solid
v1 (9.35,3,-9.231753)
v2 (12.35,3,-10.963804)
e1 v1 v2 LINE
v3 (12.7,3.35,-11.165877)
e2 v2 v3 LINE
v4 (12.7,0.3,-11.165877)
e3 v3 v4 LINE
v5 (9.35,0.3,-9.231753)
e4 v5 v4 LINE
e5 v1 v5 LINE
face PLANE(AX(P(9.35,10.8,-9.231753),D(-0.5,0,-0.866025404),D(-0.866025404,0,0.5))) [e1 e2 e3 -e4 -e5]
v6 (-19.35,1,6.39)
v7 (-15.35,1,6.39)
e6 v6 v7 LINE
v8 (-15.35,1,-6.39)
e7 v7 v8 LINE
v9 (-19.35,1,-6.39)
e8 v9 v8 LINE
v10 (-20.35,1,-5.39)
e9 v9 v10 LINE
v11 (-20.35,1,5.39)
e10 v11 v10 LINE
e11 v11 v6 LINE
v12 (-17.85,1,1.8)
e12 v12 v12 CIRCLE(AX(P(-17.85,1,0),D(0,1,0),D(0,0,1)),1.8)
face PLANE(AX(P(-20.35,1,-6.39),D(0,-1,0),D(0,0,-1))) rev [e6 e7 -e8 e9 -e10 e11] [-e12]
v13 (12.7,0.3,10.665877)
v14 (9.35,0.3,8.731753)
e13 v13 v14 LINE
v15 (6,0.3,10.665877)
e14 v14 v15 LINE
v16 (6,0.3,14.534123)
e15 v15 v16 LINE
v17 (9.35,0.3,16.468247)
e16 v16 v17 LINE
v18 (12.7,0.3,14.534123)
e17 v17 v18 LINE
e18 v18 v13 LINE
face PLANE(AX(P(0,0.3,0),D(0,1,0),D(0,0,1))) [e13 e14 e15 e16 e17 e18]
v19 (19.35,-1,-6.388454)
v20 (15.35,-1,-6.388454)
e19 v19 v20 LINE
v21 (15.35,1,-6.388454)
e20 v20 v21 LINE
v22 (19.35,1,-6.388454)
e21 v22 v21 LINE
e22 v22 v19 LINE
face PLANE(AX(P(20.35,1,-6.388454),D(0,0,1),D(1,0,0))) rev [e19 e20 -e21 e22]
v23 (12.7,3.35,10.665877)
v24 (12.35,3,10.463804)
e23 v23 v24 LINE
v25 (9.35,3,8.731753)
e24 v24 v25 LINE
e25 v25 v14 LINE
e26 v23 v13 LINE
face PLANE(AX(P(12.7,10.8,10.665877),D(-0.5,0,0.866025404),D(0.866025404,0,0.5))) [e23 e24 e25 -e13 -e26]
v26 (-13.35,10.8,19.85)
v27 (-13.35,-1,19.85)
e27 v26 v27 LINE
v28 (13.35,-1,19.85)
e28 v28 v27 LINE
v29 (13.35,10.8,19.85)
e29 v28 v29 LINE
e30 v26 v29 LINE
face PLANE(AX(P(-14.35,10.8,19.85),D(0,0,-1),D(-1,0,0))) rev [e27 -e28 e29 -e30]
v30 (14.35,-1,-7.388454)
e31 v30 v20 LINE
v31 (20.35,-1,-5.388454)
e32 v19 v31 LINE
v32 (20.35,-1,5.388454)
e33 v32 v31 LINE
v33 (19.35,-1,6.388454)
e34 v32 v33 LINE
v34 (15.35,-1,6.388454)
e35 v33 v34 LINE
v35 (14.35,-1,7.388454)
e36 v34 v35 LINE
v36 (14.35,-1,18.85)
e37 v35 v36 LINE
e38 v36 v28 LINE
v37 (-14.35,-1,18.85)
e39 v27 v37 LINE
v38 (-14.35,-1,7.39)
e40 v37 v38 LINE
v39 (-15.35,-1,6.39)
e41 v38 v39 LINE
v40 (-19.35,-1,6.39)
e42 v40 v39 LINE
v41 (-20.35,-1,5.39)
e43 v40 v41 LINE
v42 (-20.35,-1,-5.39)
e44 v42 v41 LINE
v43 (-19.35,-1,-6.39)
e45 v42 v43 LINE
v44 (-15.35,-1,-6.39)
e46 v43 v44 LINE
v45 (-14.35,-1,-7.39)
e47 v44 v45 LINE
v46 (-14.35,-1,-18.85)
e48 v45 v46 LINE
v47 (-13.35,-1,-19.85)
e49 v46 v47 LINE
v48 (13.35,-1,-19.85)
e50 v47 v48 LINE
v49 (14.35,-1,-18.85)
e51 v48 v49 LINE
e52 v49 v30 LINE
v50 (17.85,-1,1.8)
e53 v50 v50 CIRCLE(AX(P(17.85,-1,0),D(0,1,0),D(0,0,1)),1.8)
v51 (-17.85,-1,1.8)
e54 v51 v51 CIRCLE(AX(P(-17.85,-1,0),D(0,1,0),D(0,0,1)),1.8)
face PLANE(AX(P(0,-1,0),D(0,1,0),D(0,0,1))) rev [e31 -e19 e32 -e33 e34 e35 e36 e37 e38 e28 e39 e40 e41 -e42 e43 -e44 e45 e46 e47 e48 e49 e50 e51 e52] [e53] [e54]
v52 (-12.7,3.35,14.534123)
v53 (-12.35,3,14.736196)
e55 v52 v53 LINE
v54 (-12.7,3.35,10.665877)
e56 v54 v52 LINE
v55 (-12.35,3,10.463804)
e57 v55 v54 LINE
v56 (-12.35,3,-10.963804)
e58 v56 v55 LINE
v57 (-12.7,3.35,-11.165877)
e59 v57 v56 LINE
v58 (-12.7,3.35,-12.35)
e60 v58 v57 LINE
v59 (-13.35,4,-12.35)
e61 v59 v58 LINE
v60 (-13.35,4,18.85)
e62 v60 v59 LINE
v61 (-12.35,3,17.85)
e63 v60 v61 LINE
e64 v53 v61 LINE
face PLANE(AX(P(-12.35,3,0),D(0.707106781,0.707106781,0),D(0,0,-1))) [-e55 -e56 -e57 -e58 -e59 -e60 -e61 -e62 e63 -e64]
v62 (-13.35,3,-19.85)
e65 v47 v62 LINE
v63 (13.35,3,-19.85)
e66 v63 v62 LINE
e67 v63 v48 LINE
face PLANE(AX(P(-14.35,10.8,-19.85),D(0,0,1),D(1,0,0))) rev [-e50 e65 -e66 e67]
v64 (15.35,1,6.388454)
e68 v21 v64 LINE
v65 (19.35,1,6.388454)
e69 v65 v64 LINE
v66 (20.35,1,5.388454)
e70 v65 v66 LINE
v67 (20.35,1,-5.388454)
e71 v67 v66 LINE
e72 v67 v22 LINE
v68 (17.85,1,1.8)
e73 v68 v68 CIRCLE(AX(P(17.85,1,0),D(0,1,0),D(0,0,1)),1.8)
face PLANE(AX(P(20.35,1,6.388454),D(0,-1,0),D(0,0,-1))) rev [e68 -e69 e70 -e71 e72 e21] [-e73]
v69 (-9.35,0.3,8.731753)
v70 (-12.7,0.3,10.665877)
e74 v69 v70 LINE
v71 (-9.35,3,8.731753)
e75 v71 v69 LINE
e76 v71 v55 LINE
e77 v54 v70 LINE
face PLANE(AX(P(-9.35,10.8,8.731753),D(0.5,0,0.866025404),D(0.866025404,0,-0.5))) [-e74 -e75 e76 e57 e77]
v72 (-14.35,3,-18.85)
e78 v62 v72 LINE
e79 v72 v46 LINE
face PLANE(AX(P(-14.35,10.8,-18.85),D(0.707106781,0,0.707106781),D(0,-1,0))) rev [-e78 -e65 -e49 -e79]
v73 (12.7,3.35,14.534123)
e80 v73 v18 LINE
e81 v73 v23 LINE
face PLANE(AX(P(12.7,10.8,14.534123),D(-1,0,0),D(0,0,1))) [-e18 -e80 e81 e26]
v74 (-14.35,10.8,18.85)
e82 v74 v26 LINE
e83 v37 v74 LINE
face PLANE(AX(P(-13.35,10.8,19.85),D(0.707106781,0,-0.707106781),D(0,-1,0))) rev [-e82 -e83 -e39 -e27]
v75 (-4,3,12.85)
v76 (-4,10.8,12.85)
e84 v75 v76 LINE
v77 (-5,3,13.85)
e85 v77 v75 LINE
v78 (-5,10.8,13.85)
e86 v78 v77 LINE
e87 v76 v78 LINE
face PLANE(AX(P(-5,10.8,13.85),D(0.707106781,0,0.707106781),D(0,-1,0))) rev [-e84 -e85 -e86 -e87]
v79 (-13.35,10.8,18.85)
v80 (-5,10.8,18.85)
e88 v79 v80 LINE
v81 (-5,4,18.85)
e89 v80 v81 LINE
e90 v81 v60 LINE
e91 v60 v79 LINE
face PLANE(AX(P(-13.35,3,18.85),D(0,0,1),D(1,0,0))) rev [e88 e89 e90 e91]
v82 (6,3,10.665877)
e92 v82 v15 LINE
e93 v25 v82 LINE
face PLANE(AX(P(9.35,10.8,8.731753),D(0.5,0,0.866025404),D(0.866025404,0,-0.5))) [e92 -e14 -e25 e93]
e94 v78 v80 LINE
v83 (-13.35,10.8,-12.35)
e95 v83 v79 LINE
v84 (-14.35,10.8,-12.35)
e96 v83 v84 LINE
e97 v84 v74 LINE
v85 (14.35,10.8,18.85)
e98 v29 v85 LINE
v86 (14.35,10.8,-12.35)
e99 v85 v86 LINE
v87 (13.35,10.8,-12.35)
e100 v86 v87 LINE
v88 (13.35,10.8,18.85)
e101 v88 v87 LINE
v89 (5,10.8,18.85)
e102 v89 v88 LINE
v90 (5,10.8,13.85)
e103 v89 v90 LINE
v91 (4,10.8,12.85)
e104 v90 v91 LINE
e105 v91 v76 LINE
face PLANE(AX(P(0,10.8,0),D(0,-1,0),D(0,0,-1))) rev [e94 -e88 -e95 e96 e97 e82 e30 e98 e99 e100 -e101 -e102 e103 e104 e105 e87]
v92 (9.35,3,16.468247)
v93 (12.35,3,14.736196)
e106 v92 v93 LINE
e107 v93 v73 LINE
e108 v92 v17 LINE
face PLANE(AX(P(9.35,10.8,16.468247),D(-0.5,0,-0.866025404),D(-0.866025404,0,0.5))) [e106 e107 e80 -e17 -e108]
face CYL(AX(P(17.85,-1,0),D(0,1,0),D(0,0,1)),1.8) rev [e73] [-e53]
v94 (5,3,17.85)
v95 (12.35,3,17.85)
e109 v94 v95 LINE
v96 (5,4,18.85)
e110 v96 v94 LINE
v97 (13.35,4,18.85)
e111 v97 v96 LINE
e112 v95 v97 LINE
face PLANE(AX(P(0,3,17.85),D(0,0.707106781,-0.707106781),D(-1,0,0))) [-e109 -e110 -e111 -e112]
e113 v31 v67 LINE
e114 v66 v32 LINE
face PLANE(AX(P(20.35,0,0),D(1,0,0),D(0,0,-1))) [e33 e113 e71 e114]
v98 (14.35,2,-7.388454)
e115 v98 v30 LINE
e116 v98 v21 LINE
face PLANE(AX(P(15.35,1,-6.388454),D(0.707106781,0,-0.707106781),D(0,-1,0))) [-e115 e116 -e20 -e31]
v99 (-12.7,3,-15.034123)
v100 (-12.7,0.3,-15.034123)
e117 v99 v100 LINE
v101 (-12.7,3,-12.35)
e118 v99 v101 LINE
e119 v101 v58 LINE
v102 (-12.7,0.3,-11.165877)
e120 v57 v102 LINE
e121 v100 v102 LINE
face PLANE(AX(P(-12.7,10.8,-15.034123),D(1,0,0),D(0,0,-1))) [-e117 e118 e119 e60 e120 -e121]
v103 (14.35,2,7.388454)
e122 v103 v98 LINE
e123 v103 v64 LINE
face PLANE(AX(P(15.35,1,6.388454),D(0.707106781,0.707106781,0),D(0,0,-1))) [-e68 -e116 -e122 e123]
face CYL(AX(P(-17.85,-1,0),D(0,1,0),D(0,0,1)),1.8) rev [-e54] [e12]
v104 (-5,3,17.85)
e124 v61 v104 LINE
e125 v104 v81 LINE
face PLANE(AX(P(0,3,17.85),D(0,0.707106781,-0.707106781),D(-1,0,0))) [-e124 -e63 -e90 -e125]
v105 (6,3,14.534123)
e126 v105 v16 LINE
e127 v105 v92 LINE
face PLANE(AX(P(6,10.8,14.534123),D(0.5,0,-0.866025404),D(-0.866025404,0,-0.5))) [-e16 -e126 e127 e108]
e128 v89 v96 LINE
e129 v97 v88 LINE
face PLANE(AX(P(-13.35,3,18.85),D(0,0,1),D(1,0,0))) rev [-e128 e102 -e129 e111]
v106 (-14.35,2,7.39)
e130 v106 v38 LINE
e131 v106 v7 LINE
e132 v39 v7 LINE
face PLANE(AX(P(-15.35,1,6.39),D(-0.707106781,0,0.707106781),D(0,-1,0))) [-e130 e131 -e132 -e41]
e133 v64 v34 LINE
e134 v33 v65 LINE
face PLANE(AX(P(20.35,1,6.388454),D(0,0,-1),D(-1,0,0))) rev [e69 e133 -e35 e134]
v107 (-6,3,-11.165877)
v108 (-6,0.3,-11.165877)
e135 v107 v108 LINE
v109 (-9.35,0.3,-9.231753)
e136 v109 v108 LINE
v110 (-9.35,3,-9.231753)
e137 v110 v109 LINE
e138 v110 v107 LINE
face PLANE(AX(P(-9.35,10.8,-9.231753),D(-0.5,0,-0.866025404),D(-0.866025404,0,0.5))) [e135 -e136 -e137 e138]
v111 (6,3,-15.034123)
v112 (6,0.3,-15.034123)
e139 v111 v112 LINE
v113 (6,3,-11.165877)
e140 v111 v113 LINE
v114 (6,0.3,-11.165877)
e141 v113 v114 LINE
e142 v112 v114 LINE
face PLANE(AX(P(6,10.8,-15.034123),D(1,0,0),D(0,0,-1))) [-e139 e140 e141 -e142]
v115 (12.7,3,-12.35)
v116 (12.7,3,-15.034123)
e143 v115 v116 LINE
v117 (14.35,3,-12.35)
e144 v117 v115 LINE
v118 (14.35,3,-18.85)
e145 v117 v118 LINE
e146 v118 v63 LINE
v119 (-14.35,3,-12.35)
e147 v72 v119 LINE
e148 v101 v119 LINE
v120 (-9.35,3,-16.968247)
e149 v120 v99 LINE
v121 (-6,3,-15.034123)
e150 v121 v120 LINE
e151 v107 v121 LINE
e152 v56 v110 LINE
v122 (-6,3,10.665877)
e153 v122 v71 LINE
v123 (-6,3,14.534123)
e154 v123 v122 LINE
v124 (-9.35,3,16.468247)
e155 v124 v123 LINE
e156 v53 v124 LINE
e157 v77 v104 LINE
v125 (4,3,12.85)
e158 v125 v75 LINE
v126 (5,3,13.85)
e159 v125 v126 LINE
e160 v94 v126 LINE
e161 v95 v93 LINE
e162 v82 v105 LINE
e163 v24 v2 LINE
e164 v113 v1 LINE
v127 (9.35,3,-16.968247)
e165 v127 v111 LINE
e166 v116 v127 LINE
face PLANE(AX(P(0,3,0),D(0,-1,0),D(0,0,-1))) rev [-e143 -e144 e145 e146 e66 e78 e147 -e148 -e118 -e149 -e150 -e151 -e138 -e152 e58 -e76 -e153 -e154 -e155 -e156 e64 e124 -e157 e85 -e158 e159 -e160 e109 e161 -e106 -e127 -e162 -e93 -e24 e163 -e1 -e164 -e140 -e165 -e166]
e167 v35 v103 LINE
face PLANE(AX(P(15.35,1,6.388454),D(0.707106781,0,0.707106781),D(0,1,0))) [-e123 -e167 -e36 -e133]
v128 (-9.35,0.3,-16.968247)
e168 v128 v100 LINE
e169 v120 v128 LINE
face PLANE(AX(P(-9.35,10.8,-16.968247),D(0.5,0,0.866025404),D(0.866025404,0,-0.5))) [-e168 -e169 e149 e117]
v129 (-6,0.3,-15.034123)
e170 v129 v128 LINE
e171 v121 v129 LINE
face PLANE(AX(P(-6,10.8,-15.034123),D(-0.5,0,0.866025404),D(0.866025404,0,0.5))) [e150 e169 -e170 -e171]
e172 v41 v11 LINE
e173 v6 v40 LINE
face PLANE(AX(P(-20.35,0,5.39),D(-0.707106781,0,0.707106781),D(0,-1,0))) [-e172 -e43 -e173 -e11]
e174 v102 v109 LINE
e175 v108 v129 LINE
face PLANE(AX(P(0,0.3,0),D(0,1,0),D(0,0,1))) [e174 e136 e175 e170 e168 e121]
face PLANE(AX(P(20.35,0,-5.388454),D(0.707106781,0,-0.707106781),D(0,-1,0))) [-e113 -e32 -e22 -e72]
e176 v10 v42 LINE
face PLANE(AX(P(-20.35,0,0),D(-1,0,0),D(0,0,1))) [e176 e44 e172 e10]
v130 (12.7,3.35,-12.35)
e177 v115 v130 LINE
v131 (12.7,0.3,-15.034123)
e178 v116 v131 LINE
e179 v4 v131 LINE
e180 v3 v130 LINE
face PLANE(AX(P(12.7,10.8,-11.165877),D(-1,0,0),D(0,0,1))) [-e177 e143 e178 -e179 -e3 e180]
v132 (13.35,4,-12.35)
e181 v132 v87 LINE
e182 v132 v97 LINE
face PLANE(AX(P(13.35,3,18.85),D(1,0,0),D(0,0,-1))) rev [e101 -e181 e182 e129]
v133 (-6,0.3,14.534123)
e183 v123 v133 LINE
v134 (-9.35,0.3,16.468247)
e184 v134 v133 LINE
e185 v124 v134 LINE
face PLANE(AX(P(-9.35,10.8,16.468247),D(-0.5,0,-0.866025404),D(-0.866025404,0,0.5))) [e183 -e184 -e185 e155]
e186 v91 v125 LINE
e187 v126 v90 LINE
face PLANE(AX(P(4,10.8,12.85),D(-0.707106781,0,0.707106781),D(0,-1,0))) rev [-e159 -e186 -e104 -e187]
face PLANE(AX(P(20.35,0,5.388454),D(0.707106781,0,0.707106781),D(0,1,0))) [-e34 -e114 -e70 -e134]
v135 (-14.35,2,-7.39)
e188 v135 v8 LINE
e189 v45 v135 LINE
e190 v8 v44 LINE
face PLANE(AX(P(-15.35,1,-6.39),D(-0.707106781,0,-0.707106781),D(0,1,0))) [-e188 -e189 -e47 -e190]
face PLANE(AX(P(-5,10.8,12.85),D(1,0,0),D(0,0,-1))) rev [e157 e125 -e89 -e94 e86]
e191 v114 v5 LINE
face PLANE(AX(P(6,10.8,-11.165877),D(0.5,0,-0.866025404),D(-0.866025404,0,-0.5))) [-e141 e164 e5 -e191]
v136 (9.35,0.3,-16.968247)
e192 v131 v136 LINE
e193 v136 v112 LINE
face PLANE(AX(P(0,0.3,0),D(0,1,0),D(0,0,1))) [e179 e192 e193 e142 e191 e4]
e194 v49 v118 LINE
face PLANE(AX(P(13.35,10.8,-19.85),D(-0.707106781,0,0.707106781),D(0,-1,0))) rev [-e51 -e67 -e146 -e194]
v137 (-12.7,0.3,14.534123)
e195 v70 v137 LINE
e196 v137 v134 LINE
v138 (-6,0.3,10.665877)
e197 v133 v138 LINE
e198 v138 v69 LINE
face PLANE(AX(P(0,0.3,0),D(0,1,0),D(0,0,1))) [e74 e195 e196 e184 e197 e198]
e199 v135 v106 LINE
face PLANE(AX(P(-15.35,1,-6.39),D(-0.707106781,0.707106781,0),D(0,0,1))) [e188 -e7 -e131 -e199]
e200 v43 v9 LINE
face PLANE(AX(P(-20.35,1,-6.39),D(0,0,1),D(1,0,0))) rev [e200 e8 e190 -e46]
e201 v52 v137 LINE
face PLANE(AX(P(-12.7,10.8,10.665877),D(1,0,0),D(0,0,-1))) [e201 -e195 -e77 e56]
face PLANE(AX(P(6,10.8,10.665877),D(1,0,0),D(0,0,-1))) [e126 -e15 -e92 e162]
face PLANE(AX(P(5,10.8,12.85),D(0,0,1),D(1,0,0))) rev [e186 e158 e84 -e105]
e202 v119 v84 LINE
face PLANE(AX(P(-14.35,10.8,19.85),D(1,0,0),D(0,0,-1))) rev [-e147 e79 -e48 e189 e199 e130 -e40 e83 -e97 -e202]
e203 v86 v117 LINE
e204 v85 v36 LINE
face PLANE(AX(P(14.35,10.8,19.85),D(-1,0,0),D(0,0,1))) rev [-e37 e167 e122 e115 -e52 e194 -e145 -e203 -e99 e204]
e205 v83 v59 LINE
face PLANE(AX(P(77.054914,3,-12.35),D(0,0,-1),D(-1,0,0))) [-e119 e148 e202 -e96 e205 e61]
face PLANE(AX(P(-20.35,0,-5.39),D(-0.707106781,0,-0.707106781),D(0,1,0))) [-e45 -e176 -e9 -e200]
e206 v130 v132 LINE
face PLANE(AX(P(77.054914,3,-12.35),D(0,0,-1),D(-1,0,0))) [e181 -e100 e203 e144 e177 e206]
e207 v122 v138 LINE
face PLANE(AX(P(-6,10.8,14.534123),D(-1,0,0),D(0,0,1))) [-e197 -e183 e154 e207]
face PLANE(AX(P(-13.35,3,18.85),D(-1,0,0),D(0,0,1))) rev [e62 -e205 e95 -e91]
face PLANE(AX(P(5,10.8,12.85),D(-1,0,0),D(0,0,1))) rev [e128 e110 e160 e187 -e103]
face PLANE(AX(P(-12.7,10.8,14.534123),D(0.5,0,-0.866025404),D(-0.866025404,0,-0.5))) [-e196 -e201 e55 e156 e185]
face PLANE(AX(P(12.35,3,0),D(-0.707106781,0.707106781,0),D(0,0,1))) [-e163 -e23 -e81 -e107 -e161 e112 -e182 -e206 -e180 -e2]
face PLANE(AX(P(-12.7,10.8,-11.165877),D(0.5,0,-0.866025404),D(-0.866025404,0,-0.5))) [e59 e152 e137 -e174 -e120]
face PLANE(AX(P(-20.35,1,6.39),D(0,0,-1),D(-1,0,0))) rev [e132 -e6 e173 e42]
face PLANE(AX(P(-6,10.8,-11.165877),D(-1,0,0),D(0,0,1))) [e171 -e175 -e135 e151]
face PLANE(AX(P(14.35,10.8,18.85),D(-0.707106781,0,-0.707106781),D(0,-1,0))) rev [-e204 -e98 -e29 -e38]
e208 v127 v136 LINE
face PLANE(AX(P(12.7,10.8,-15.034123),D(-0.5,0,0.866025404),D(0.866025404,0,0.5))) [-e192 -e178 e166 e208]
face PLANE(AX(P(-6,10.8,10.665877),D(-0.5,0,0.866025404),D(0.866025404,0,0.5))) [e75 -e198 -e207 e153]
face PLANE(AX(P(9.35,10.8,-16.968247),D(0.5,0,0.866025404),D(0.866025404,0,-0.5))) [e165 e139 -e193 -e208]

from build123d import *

# Parameters (mm, degrees)
SKETCH2_W               = 28.7
SKETCH2_H               = 39.7
BOSS_EXTRUDE1_DEPTH     = 10.8
SKETCH3_W               = 26.7
SKETCH3_H               = 37.7
CUT_EXTRUDE1_DEPTH      = 7.8
CUT_EXTRUDE2_DEPTH      = 37.528790016
CUT_EXTRUDE2_DEPTH_BACK = 37.528790016
SKETCH4_W               = 7.5
SKETCH4_H               = 7.8
SKETCH6_W               = 28.7
SKETCH6_H               = 39.7
BOSS_EXTRUDE2_DEPTH     = 1
CUT_EXTRUDE3_DEPTH      = 26.705738659
CUT_EXTRUDE3_DEPTH_BACK = 2.7
SKETCH10_W              = 12.7769089
SKETCH10_H              = 2
BOSS_EXTRUDE3_DEPTH     = 6
SKETCH11_R              = 1.8
CUT_EXTRUDE4_DEPTH      = 31.069669104
SKETCH12_W              = 12.78
SKETCH12_H              = 2
BOSS_EXTRUDE4_DEPTH     = 6
SKETCH14_R              = 1.8
CUT_EXTRUDE5_DEPTH      = 31.069669104
CHAMFER1_SIZE           = 1
SKETCH16_W              = 10
SKETCH16_H              = 6
BOSS_EXTRUDE5_DEPTH     = 7.8
CHAMFER2_SIZE           = 1


with BuildPart() as part:
    # Sketch2 → Boss-Extrude1 (new body)
    with BuildSketch(Plane(origin=(0, 0, 0), x_dir=(1, 0, 0), z_dir=(0, 1, 0))):
        Rectangle(SKETCH2_W, SKETCH2_H)
    extrude(amount=BOSS_EXTRUDE1_DEPTH)

    # Sketch3 → Cut-Extrude1 (cut)
    with BuildSketch(Plane(origin=(0, 10.8, 0), x_dir=(1, 0, 0), z_dir=(0, 1, 0))):
        Rectangle(SKETCH3_W, SKETCH3_H)
    extrude(amount=-CUT_EXTRUDE1_DEPTH, mode=Mode.SUBTRACT)

    # Sketch4 → Cut-Extrude2 (cut, two sides: drawn at the far end of the back side and taken through both)
    with BuildSketch(Plane(origin=(14.35, 0, 0), x_dir=(0, 0, -1), z_dir=(1, 0, 0)).offset(-CUT_EXTRUDE2_DEPTH_BACK)):
        with Locations((16.1, 6.9)):
            Rectangle(SKETCH4_W, SKETCH4_H)
    extrude(amount=CUT_EXTRUDE2_DEPTH + CUT_EXTRUDE2_DEPTH_BACK, mode=Mode.SUBTRACT)

    # Sketch6 → Boss-Extrude2 (add)
    with BuildSketch(Plane.XZ):
        Rectangle(SKETCH6_W, SKETCH6_H)
    extrude(amount=BOSS_EXTRUDE2_DEPTH)

    # Sketch9 → Cut-Extrude3 (cut, two sides: drawn at the far end of the back side and taken through both)
    with BuildSketch(Plane(origin=(0, 3, 0), x_dir=(1, 0, 0), z_dir=(0, 1, 0)).offset(-CUT_EXTRUDE3_DEPTH_BACK)):
        Polygon((-9.35, -8.731753196), (-12.7, -10.665876598), (-12.7, -14.534123402), (-9.35, -16.468246804), (-6, -14.534123402), (-6, -10.665876598), align=None)
        Polygon((9.35, -8.731753196), (6, -10.665876598), (6, -14.534123402), (9.35, -16.468246804), (12.7, -14.534123402), (12.7, -10.665876598), align=None)
        Polygon((-9.35, 16.968246804), (-12.7, 15.034123402), (-12.7, 11.165876598), (-9.35, 9.231753196), (-6, 11.165876598), (-6, 15.034123402), align=None)
        Polygon((9.35, 16.968246804), (6, 15.034123402), (6, 11.165876598), (9.35, 9.231753196), (12.7, 11.165876598), (12.7, 15.034123402), align=None)
    extrude(amount=CUT_EXTRUDE3_DEPTH + CUT_EXTRUDE3_DEPTH_BACK, mode=Mode.SUBTRACT)

    # Sketch10 → Boss-Extrude3 (add)
    with BuildSketch(Plane(origin=(14.35, 0, 0), x_dir=(0, 0, -1), z_dir=(1, 0, 0))):
        Rectangle(SKETCH10_W, SKETCH10_H)
    extrude(amount=BOSS_EXTRUDE3_DEPTH)

    # Sketch11 → Cut-Extrude4 (cut, through all)
    with BuildSketch(Plane(origin=(0, 1, 0), x_dir=(1, 0, 0), z_dir=(0, 1, 0))):
        with Locations(Location((17.85, 0, 0), (0, 0, 270))):
            Circle(SKETCH11_R)
    extrude(amount=-CUT_EXTRUDE4_DEPTH, mode=Mode.SUBTRACT)

    # Sketch12 → Boss-Extrude4 (add)
    with BuildSketch(Plane.ZY.offset(14.35)):
        Rectangle(SKETCH12_W, SKETCH12_H)
    extrude(amount=BOSS_EXTRUDE4_DEPTH)

    # Sketch14 → Cut-Extrude5 (cut, through all)
    with BuildSketch(Plane(origin=(0, 1, 0), x_dir=(1, 0, 0), z_dir=(0, 1, 0))):
        with Locations(Location((-17.85, 0, 0), (0, 0, 270))):
            Circle(SKETCH14_R)
    extrude(amount=-CUT_EXTRUDE5_DEPTH, mode=Mode.SUBTRACT)

    # Chamfer1
    chamfer1_edges = [part.edges().sort_by_distance(p)[0] for p in [
        (14.35, 0, -6.38845445),
        (14.35, 1, 0),
        (14.35, 0, 6.38845445),
        (20.35, 0, -6.38845445),
        (20.35, 0, 6.38845445),
        (-14.35, 0, 6.39),
        (-14.35, 1, 0),
        (-14.35, 0, -6.39),
        (-20.35, 0, 6.39),
        (-20.35, 0, -6.39),
        (-14.35, 1, -19.85),
        (14.35, 1, -19.85),
        (14.35, 4.9, 19.85),
        (-14.35, 4.9, 19.85),
    ]]
    chamfer(chamfer1_edges, length=CHAMFER1_SIZE)

    # Sketch16 → Boss-Extrude5 (add)
    with BuildSketch(Plane(origin=(0, 3, 0), x_dir=(1, 0, 0), z_dir=(0, 1, 0))):
        with Locations((0, -15.85)):
            Rectangle(SKETCH16_W, SKETCH16_H)
    extrude(amount=BOSS_EXTRUDE5_DEPTH)

    # Chamfer2
    # the kernel refuses this chamfer: 1 mm, written as the material it adds along each edge
    with BuildSketch(Plane(origin=(13.35, 3, 18.85), x_dir=(0.027495876610585623, 0.9996219169112968, 0), z_dir=(0, 0, -1))) as chamfer2_piece_1_section:
        Polygon((CHAMFER2_SIZE * 0.999621916911, -CHAMFER2_SIZE * 0.0274958766106), (-CHAMFER2_SIZE * 0.0274958766106, -CHAMFER2_SIZE * 0.999621916911), (0, 0), align=None)
    chamfer2_piece_1 = extrude(amount=31.2, mode=Mode.PRIVATE)
    chamfer2_piece_1 = split(chamfer2_piece_1, bisect_by=Plane(origin=(12.111347434, 3.369117542, 14.873982119), z_dir=(0.500000000000001, 0, 0.8660254037844382)), keep=Keep.TOP, mode=Mode.PRIVATE)
    chamfer2_piece_1 = split(chamfer2_piece_1, bisect_by=Plane(origin=(12.7, 3.369117542, 16.577989782), z_dir=(1, 0, 0)), keep=Keep.TOP, mode=Mode.PRIVATE)
    add(chamfer2_piece_1)
    with BuildSketch(Plane(origin=(13.35, 3, 18.85), x_dir=(0.027495876610585623, 0.9996219169112968, 0), z_dir=(0, 0, -1))) as chamfer2_piece_2_section:
        Polygon((CHAMFER2_SIZE * 0.999621916911, -CHAMFER2_SIZE * 0.0274958766106), (-CHAMFER2_SIZE * 0.0274958766106, -CHAMFER2_SIZE * 0.999621916911), (0, 0), align=None)
    chamfer2_piece_2 = extrude(amount=31.2, mode=Mode.PRIVATE)
    chamfer2_piece_2 = split(chamfer2_piece_2, bisect_by=Plane(origin=(11.651023247, 3.093736145, 15.139750413), z_dir=(0.500000000000001, 0, 0.8660254037844382)), keep=Keep.TOP, mode=Mode.PRIVATE)
    chamfer2_piece_2 = split(chamfer2_piece_2, bisect_by=Plane(origin=(12.7, 3.093736145, 16.729857379), z_dir=(-1, 0, 0)), keep=Keep.TOP, mode=Mode.PRIVATE)
    add(chamfer2_piece_2)
    with BuildSketch(Plane(origin=(13.35, 3, 18.85), x_dir=(0.027495876610585623, 0.9996219169112968, 0), z_dir=(0, 0, -1))) as chamfer2_piece_3_section:
        Polygon((CHAMFER2_SIZE * 0.999621916911, -CHAMFER2_SIZE * 0.0274958766106), (-CHAMFER2_SIZE * 0.0274958766106, -CHAMFER2_SIZE * 0.999621916911), (0, 0), align=None)
    chamfer2_piece_3 = extrude(amount=31.2, mode=Mode.PRIVATE)
    chamfer2_piece_3 = split(chamfer2_piece_3, bisect_by=Plane(origin=(13.821591652, 3.360169767, 13.886572159), z_dir=(-0.500000000000001, 0, -0.8660254037844382)), keep=Keep.TOP, mode=Mode.PRIVATE)
    chamfer2_piece_3 = split(chamfer2_piece_3, bisect_by=Plane(origin=(13.821591652, 3.360169767, 11.313427841), z_dir=(-0.5000000000000001, 0, 0.8660254037844386)), keep=Keep.TOP, mode=Mode.PRIVATE)
    chamfer2_piece_3 = split(chamfer2_piece_3, bisect_by=Plane(origin=(12.7, 3.360169767, 12.6), z_dir=(1, 0, 0)), keep=Keep.TOP, mode=Mode.PRIVATE)
    add(chamfer2_piece_3)
    with BuildSketch(Plane(origin=(13.35, 3, 18.85), x_dir=(0.027495876610585623, 0.9996219169112968, 0), z_dir=(0, 0, -1))) as chamfer2_piece_4_section:
        Polygon((CHAMFER2_SIZE * 0.999621916911, -CHAMFER2_SIZE * 0.0274958766106), (-CHAMFER2_SIZE * 0.0274958766106, -CHAMFER2_SIZE * 0.999621916911), (0, 0), align=None)
    chamfer2_piece_4 = extrude(amount=31.2, mode=Mode.PRIVATE)
    chamfer2_piece_4 = split(chamfer2_piece_4, bisect_by=Plane(origin=(8.267666364, 3.367668541, 8.10686758), z_dir=(0.5000000000000001, 0, -0.8660254037844386)), keep=Keep.TOP, mode=Mode.PRIVATE)
    chamfer2_piece_4 = split(chamfer2_piece_4, bisect_by=Plane(origin=(12.7, 3.367668541, -0.25), z_dir=(1, 0, 0)), keep=Keep.TOP, mode=Mode.PRIVATE)
    chamfer2_piece_4 = split(chamfer2_piece_4, bisect_by=Plane(origin=(8.267666364, 3.367668541, -8.60686758), z_dir=(0.5000000000000003, 0, 0.8660254037844387)), keep=Keep.TOP, mode=Mode.PRIVATE)
    add(chamfer2_piece_4)
    with BuildSketch(Plane(origin=(13.35, 3, 18.85), x_dir=(0.027495876610585623, 0.9996219169112968, 0), z_dir=(0, 0, -1))) as chamfer2_piece_5_section:
        Polygon((CHAMFER2_SIZE * 0.999621916911, -CHAMFER2_SIZE * 0.0274958766106), (-CHAMFER2_SIZE * 0.0274958766106, -CHAMFER2_SIZE * 0.999621916911), (0, 0), align=None)
    chamfer2_piece_5 = extrude(amount=31.2, mode=Mode.PRIVATE)
    chamfer2_piece_5 = split(chamfer2_piece_5, bisect_by=Plane(origin=(7.874549458, 3.093354027, 7.879901429), z_dir=(0.5000000000000001, 0, -0.8660254037844386)), keep=Keep.TOP, mode=Mode.PRIVATE)
    chamfer2_piece_5 = split(chamfer2_piece_5, bisect_by=Plane(origin=(12.7, 3.093354027, -0.25), z_dir=(-1, 0, 0)), keep=Keep.TOP, mode=Mode.PRIVATE)
    chamfer2_piece_5 = split(chamfer2_piece_5, bisect_by=Plane(origin=(7.874549458, 3.093354027, -8.379901429), z_dir=(0.5000000000000003, 0, 0.8660254037844387)), keep=Keep.TOP, mode=Mode.PRIVATE)
    add(chamfer2_piece_5)
    with BuildSketch(Plane(origin=(13.35, 3, 18.85), x_dir=(0.027495876610585623, 0.9996219169112968, 0), z_dir=(0, 0, -1))) as chamfer2_piece_6_section:
        Polygon((CHAMFER2_SIZE * 0.999621916911, -CHAMFER2_SIZE * 0.0274958766106), (-CHAMFER2_SIZE * 0.0274958766106, -CHAMFER2_SIZE * 0.999621916911), (0, 0), align=None)
    chamfer2_piece_6 = extrude(amount=31.2, mode=Mode.PRIVATE)
    chamfer2_piece_6 = split(chamfer2_piece_6, bisect_by=Plane(origin=(12.7, 3.355082682, -11.864598925), z_dir=(1, 0, 0)), keep=Keep.TOP, mode=Mode.PRIVATE)
    chamfer2_piece_6 = split(chamfer2_piece_6, bisect_by=Plane(origin=(13.279668077, 3.355082682, -11.500548118), z_dir=(-0.5000000000000003, 0, -0.8660254037844387)), keep=Keep.TOP, mode=Mode.PRIVATE)
    add(chamfer2_piece_6)
    with BuildSketch(Plane(origin=(-13.35, 3, 18.85), x_dir=(0, 0.9996219169112968, 0.027495876610585623), z_dir=(1, 0, 0)), Plane(origin=(2.428317012, 3, 18.85), x_dir=(0, 0.9996219169112968, 0.027495876610585623), z_dir=(1, 0, 0))) as chamfer2_piece_7:
        Polygon((CHAMFER2_SIZE * 0.999621916911, -CHAMFER2_SIZE * 0.0274958766106), (-CHAMFER2_SIZE * 0.0274958766106, -CHAMFER2_SIZE * 0.999621916911), (0, 0), align=None)
    extrude(amount=10.921682988)
    with BuildSketch(Plane(origin=(-13.35, 3, -12.35), x_dir=(-0.027495876610585623, 0.9996219169112968, 0), z_dir=(0, 0, 1))) as chamfer2_piece_8_section:
        Polygon((CHAMFER2_SIZE * 0.999621916911, -CHAMFER2_SIZE * 0.0274958766106), (-CHAMFER2_SIZE * 0.0274958766106, -CHAMFER2_SIZE * 0.999621916911), (0, 0), align=None)
    chamfer2_piece_8 = extrude(amount=31.2, mode=Mode.PRIVATE)
    chamfer2_piece_8 = split(chamfer2_piece_8, bisect_by=Plane(origin=(-12.7, 3.355082682, -11.864598925), z_dir=(-1, 0, 0)), keep=Keep.TOP, mode=Mode.PRIVATE)
    chamfer2_piece_8 = split(chamfer2_piece_8, bisect_by=Plane(origin=(-13.279668077, 3.355082682, -11.500548118), z_dir=(0.5000000000000003, 0, -0.8660254037844387)), keep=Keep.TOP, mode=Mode.PRIVATE)
    add(chamfer2_piece_8)
    with BuildSketch(Plane(origin=(-13.35, 3, -12.35), x_dir=(-0.027495876610585623, 0.9996219169112968, 0), z_dir=(0, 0, 1))) as chamfer2_piece_9_section:
        Polygon((CHAMFER2_SIZE * 0.999621916911, -CHAMFER2_SIZE * 0.0274958766106), (-CHAMFER2_SIZE * 0.0274958766106, -CHAMFER2_SIZE * 0.999621916911), (0, 0), align=None)
    chamfer2_piece_9 = extrude(amount=31.2, mode=Mode.PRIVATE)
    chamfer2_piece_9 = split(chamfer2_piece_9, bisect_by=Plane(origin=(-12.7, 3.367668541, -0.25), z_dir=(-1, 0, 0)), keep=Keep.TOP, mode=Mode.PRIVATE)
    chamfer2_piece_9 = split(chamfer2_piece_9, bisect_by=Plane(origin=(-8.267666364, 3.367668541, 8.10686758), z_dir=(-0.49999999999999967, 0, -0.8660254037844389)), keep=Keep.TOP, mode=Mode.PRIVATE)
    chamfer2_piece_9 = split(chamfer2_piece_9, bisect_by=Plane(origin=(-8.267666364, 3.367668541, -8.60686758), z_dir=(-0.5000000000000003, 0, 0.8660254037844387)), keep=Keep.TOP, mode=Mode.PRIVATE)
    add(chamfer2_piece_9)
    with BuildSketch(Plane(origin=(-13.35, 3, -12.35), x_dir=(-0.027495876610585623, 0.9996219169112968, 0), z_dir=(0, 0, 1))) as chamfer2_piece_10_section:
        Polygon((CHAMFER2_SIZE * 0.999621916911, -CHAMFER2_SIZE * 0.0274958766106), (-CHAMFER2_SIZE * 0.0274958766106, -CHAMFER2_SIZE * 0.999621916911), (0, 0), align=None)
    chamfer2_piece_10 = extrude(amount=31.2, mode=Mode.PRIVATE)
    chamfer2_piece_10 = split(chamfer2_piece_10, bisect_by=Plane(origin=(-12.7, 3.093354027, -0.25), z_dir=(1, 0, 0)), keep=Keep.TOP, mode=Mode.PRIVATE)
    chamfer2_piece_10 = split(chamfer2_piece_10, bisect_by=Plane(origin=(-7.874549458, 3.093354027, 7.879901429), z_dir=(-0.49999999999999967, 0, -0.8660254037844389)), keep=Keep.TOP, mode=Mode.PRIVATE)
    chamfer2_piece_10 = split(chamfer2_piece_10, bisect_by=Plane(origin=(-7.874549458, 3.093354027, -8.379901429), z_dir=(-0.5000000000000003, 0, 0.8660254037844387)), keep=Keep.TOP, mode=Mode.PRIVATE)
    add(chamfer2_piece_10)
    with BuildSketch(Plane(origin=(-13.35, 3, -12.35), x_dir=(-0.027495876610585623, 0.9996219169112968, 0), z_dir=(0, 0, 1))) as chamfer2_piece_11_section:
        Polygon((CHAMFER2_SIZE * 0.999621916911, -CHAMFER2_SIZE * 0.0274958766106), (-CHAMFER2_SIZE * 0.0274958766106, -CHAMFER2_SIZE * 0.999621916911), (0, 0), align=None)
    chamfer2_piece_11 = extrude(amount=31.2, mode=Mode.PRIVATE)
    chamfer2_piece_11 = split(chamfer2_piece_11, bisect_by=Plane(origin=(-12.7, 3.360169767, 12.6), z_dir=(-1, 0, 0)), keep=Keep.TOP, mode=Mode.PRIVATE)
    chamfer2_piece_11 = split(chamfer2_piece_11, bisect_by=Plane(origin=(-13.821591652, 3.360169767, 13.886572159), z_dir=(0.4999999999999996, 0, -0.8660254037844389)), keep=Keep.TOP, mode=Mode.PRIVATE)
    chamfer2_piece_11 = split(chamfer2_piece_11, bisect_by=Plane(origin=(-13.821591652, 3.360169767, 11.313427841), z_dir=(0.49999999999999967, 0, 0.8660254037844389)), keep=Keep.TOP, mode=Mode.PRIVATE)
    add(chamfer2_piece_11)
    with BuildSketch(Plane(origin=(-13.35, 3, -12.35), x_dir=(-0.027495876610585623, 0.9996219169112968, 0), z_dir=(0, 0, 1))) as chamfer2_piece_12_section:
        Polygon((CHAMFER2_SIZE * 0.999621916911, -CHAMFER2_SIZE * 0.0274958766106), (-CHAMFER2_SIZE * 0.0274958766106, -CHAMFER2_SIZE * 0.999621916911), (0, 0), align=None)
    chamfer2_piece_12 = extrude(amount=31.2, mode=Mode.PRIVATE)
    chamfer2_piece_12 = split(chamfer2_piece_12, bisect_by=Plane(origin=(-12.7, 3.369117542, 16.577989782), z_dir=(-1, 0, 0)), keep=Keep.TOP, mode=Mode.PRIVATE)
    chamfer2_piece_12 = split(chamfer2_piece_12, bisect_by=Plane(origin=(-12.111347434, 3.369117542, 14.873982119), z_dir=(-0.4999999999999996, 0, 0.8660254037844389)), keep=Keep.TOP, mode=Mode.PRIVATE)
    add(chamfer2_piece_12)
    with BuildSketch(Plane(origin=(-13.35, 3, -12.35), x_dir=(-0.027495876610585623, 0.9996219169112968, 0), z_dir=(0, 0, 1))) as chamfer2_piece_13_section:
        Polygon((CHAMFER2_SIZE * 0.999621916911, -CHAMFER2_SIZE * 0.0274958766106), (-CHAMFER2_SIZE * 0.0274958766106, -CHAMFER2_SIZE * 0.999621916911), (0, 0), align=None)
    chamfer2_piece_13 = extrude(amount=31.2, mode=Mode.PRIVATE)
    chamfer2_piece_13 = split(chamfer2_piece_13, bisect_by=Plane(origin=(-12.7, 3.093736145, 16.729857379), z_dir=(1, 0, 0)), keep=Keep.TOP, mode=Mode.PRIVATE)
    chamfer2_piece_13 = split(chamfer2_piece_13, bisect_by=Plane(origin=(-11.651023247, 3.093736145, 15.139750413), z_dir=(-0.4999999999999996, 0, 0.8660254037844389)), keep=Keep.TOP, mode=Mode.PRIVATE)
    add(chamfer2_piece_13)
    # the kernel refuses this chamfer: 1 mm, written as the material it takes off along each edge
    with BuildSketch(Plane(origin=(-5, 3, 12.85), x_dir=(0.9996219169112968, 0, -0.027495876610585623), z_dir=(0, 1, 0)), Plane(origin=(5, 3, 12.85), x_dir=(0.02749587661058651, 0, 0.9996219169112968), z_dir=(0, 1, 0))) as chamfer2_2_piece_1:
        Polygon((CHAMFER2_SIZE * 0.999621916911, -CHAMFER2_SIZE * 0.0274958766106), (-CHAMFER2_SIZE * 0.0274958766106, -CHAMFER2_SIZE * 0.999621916911), (0, 0), align=None)
    extrude(amount=10.371682988, mode=Mode.SUBTRACT)


solid = part.part
